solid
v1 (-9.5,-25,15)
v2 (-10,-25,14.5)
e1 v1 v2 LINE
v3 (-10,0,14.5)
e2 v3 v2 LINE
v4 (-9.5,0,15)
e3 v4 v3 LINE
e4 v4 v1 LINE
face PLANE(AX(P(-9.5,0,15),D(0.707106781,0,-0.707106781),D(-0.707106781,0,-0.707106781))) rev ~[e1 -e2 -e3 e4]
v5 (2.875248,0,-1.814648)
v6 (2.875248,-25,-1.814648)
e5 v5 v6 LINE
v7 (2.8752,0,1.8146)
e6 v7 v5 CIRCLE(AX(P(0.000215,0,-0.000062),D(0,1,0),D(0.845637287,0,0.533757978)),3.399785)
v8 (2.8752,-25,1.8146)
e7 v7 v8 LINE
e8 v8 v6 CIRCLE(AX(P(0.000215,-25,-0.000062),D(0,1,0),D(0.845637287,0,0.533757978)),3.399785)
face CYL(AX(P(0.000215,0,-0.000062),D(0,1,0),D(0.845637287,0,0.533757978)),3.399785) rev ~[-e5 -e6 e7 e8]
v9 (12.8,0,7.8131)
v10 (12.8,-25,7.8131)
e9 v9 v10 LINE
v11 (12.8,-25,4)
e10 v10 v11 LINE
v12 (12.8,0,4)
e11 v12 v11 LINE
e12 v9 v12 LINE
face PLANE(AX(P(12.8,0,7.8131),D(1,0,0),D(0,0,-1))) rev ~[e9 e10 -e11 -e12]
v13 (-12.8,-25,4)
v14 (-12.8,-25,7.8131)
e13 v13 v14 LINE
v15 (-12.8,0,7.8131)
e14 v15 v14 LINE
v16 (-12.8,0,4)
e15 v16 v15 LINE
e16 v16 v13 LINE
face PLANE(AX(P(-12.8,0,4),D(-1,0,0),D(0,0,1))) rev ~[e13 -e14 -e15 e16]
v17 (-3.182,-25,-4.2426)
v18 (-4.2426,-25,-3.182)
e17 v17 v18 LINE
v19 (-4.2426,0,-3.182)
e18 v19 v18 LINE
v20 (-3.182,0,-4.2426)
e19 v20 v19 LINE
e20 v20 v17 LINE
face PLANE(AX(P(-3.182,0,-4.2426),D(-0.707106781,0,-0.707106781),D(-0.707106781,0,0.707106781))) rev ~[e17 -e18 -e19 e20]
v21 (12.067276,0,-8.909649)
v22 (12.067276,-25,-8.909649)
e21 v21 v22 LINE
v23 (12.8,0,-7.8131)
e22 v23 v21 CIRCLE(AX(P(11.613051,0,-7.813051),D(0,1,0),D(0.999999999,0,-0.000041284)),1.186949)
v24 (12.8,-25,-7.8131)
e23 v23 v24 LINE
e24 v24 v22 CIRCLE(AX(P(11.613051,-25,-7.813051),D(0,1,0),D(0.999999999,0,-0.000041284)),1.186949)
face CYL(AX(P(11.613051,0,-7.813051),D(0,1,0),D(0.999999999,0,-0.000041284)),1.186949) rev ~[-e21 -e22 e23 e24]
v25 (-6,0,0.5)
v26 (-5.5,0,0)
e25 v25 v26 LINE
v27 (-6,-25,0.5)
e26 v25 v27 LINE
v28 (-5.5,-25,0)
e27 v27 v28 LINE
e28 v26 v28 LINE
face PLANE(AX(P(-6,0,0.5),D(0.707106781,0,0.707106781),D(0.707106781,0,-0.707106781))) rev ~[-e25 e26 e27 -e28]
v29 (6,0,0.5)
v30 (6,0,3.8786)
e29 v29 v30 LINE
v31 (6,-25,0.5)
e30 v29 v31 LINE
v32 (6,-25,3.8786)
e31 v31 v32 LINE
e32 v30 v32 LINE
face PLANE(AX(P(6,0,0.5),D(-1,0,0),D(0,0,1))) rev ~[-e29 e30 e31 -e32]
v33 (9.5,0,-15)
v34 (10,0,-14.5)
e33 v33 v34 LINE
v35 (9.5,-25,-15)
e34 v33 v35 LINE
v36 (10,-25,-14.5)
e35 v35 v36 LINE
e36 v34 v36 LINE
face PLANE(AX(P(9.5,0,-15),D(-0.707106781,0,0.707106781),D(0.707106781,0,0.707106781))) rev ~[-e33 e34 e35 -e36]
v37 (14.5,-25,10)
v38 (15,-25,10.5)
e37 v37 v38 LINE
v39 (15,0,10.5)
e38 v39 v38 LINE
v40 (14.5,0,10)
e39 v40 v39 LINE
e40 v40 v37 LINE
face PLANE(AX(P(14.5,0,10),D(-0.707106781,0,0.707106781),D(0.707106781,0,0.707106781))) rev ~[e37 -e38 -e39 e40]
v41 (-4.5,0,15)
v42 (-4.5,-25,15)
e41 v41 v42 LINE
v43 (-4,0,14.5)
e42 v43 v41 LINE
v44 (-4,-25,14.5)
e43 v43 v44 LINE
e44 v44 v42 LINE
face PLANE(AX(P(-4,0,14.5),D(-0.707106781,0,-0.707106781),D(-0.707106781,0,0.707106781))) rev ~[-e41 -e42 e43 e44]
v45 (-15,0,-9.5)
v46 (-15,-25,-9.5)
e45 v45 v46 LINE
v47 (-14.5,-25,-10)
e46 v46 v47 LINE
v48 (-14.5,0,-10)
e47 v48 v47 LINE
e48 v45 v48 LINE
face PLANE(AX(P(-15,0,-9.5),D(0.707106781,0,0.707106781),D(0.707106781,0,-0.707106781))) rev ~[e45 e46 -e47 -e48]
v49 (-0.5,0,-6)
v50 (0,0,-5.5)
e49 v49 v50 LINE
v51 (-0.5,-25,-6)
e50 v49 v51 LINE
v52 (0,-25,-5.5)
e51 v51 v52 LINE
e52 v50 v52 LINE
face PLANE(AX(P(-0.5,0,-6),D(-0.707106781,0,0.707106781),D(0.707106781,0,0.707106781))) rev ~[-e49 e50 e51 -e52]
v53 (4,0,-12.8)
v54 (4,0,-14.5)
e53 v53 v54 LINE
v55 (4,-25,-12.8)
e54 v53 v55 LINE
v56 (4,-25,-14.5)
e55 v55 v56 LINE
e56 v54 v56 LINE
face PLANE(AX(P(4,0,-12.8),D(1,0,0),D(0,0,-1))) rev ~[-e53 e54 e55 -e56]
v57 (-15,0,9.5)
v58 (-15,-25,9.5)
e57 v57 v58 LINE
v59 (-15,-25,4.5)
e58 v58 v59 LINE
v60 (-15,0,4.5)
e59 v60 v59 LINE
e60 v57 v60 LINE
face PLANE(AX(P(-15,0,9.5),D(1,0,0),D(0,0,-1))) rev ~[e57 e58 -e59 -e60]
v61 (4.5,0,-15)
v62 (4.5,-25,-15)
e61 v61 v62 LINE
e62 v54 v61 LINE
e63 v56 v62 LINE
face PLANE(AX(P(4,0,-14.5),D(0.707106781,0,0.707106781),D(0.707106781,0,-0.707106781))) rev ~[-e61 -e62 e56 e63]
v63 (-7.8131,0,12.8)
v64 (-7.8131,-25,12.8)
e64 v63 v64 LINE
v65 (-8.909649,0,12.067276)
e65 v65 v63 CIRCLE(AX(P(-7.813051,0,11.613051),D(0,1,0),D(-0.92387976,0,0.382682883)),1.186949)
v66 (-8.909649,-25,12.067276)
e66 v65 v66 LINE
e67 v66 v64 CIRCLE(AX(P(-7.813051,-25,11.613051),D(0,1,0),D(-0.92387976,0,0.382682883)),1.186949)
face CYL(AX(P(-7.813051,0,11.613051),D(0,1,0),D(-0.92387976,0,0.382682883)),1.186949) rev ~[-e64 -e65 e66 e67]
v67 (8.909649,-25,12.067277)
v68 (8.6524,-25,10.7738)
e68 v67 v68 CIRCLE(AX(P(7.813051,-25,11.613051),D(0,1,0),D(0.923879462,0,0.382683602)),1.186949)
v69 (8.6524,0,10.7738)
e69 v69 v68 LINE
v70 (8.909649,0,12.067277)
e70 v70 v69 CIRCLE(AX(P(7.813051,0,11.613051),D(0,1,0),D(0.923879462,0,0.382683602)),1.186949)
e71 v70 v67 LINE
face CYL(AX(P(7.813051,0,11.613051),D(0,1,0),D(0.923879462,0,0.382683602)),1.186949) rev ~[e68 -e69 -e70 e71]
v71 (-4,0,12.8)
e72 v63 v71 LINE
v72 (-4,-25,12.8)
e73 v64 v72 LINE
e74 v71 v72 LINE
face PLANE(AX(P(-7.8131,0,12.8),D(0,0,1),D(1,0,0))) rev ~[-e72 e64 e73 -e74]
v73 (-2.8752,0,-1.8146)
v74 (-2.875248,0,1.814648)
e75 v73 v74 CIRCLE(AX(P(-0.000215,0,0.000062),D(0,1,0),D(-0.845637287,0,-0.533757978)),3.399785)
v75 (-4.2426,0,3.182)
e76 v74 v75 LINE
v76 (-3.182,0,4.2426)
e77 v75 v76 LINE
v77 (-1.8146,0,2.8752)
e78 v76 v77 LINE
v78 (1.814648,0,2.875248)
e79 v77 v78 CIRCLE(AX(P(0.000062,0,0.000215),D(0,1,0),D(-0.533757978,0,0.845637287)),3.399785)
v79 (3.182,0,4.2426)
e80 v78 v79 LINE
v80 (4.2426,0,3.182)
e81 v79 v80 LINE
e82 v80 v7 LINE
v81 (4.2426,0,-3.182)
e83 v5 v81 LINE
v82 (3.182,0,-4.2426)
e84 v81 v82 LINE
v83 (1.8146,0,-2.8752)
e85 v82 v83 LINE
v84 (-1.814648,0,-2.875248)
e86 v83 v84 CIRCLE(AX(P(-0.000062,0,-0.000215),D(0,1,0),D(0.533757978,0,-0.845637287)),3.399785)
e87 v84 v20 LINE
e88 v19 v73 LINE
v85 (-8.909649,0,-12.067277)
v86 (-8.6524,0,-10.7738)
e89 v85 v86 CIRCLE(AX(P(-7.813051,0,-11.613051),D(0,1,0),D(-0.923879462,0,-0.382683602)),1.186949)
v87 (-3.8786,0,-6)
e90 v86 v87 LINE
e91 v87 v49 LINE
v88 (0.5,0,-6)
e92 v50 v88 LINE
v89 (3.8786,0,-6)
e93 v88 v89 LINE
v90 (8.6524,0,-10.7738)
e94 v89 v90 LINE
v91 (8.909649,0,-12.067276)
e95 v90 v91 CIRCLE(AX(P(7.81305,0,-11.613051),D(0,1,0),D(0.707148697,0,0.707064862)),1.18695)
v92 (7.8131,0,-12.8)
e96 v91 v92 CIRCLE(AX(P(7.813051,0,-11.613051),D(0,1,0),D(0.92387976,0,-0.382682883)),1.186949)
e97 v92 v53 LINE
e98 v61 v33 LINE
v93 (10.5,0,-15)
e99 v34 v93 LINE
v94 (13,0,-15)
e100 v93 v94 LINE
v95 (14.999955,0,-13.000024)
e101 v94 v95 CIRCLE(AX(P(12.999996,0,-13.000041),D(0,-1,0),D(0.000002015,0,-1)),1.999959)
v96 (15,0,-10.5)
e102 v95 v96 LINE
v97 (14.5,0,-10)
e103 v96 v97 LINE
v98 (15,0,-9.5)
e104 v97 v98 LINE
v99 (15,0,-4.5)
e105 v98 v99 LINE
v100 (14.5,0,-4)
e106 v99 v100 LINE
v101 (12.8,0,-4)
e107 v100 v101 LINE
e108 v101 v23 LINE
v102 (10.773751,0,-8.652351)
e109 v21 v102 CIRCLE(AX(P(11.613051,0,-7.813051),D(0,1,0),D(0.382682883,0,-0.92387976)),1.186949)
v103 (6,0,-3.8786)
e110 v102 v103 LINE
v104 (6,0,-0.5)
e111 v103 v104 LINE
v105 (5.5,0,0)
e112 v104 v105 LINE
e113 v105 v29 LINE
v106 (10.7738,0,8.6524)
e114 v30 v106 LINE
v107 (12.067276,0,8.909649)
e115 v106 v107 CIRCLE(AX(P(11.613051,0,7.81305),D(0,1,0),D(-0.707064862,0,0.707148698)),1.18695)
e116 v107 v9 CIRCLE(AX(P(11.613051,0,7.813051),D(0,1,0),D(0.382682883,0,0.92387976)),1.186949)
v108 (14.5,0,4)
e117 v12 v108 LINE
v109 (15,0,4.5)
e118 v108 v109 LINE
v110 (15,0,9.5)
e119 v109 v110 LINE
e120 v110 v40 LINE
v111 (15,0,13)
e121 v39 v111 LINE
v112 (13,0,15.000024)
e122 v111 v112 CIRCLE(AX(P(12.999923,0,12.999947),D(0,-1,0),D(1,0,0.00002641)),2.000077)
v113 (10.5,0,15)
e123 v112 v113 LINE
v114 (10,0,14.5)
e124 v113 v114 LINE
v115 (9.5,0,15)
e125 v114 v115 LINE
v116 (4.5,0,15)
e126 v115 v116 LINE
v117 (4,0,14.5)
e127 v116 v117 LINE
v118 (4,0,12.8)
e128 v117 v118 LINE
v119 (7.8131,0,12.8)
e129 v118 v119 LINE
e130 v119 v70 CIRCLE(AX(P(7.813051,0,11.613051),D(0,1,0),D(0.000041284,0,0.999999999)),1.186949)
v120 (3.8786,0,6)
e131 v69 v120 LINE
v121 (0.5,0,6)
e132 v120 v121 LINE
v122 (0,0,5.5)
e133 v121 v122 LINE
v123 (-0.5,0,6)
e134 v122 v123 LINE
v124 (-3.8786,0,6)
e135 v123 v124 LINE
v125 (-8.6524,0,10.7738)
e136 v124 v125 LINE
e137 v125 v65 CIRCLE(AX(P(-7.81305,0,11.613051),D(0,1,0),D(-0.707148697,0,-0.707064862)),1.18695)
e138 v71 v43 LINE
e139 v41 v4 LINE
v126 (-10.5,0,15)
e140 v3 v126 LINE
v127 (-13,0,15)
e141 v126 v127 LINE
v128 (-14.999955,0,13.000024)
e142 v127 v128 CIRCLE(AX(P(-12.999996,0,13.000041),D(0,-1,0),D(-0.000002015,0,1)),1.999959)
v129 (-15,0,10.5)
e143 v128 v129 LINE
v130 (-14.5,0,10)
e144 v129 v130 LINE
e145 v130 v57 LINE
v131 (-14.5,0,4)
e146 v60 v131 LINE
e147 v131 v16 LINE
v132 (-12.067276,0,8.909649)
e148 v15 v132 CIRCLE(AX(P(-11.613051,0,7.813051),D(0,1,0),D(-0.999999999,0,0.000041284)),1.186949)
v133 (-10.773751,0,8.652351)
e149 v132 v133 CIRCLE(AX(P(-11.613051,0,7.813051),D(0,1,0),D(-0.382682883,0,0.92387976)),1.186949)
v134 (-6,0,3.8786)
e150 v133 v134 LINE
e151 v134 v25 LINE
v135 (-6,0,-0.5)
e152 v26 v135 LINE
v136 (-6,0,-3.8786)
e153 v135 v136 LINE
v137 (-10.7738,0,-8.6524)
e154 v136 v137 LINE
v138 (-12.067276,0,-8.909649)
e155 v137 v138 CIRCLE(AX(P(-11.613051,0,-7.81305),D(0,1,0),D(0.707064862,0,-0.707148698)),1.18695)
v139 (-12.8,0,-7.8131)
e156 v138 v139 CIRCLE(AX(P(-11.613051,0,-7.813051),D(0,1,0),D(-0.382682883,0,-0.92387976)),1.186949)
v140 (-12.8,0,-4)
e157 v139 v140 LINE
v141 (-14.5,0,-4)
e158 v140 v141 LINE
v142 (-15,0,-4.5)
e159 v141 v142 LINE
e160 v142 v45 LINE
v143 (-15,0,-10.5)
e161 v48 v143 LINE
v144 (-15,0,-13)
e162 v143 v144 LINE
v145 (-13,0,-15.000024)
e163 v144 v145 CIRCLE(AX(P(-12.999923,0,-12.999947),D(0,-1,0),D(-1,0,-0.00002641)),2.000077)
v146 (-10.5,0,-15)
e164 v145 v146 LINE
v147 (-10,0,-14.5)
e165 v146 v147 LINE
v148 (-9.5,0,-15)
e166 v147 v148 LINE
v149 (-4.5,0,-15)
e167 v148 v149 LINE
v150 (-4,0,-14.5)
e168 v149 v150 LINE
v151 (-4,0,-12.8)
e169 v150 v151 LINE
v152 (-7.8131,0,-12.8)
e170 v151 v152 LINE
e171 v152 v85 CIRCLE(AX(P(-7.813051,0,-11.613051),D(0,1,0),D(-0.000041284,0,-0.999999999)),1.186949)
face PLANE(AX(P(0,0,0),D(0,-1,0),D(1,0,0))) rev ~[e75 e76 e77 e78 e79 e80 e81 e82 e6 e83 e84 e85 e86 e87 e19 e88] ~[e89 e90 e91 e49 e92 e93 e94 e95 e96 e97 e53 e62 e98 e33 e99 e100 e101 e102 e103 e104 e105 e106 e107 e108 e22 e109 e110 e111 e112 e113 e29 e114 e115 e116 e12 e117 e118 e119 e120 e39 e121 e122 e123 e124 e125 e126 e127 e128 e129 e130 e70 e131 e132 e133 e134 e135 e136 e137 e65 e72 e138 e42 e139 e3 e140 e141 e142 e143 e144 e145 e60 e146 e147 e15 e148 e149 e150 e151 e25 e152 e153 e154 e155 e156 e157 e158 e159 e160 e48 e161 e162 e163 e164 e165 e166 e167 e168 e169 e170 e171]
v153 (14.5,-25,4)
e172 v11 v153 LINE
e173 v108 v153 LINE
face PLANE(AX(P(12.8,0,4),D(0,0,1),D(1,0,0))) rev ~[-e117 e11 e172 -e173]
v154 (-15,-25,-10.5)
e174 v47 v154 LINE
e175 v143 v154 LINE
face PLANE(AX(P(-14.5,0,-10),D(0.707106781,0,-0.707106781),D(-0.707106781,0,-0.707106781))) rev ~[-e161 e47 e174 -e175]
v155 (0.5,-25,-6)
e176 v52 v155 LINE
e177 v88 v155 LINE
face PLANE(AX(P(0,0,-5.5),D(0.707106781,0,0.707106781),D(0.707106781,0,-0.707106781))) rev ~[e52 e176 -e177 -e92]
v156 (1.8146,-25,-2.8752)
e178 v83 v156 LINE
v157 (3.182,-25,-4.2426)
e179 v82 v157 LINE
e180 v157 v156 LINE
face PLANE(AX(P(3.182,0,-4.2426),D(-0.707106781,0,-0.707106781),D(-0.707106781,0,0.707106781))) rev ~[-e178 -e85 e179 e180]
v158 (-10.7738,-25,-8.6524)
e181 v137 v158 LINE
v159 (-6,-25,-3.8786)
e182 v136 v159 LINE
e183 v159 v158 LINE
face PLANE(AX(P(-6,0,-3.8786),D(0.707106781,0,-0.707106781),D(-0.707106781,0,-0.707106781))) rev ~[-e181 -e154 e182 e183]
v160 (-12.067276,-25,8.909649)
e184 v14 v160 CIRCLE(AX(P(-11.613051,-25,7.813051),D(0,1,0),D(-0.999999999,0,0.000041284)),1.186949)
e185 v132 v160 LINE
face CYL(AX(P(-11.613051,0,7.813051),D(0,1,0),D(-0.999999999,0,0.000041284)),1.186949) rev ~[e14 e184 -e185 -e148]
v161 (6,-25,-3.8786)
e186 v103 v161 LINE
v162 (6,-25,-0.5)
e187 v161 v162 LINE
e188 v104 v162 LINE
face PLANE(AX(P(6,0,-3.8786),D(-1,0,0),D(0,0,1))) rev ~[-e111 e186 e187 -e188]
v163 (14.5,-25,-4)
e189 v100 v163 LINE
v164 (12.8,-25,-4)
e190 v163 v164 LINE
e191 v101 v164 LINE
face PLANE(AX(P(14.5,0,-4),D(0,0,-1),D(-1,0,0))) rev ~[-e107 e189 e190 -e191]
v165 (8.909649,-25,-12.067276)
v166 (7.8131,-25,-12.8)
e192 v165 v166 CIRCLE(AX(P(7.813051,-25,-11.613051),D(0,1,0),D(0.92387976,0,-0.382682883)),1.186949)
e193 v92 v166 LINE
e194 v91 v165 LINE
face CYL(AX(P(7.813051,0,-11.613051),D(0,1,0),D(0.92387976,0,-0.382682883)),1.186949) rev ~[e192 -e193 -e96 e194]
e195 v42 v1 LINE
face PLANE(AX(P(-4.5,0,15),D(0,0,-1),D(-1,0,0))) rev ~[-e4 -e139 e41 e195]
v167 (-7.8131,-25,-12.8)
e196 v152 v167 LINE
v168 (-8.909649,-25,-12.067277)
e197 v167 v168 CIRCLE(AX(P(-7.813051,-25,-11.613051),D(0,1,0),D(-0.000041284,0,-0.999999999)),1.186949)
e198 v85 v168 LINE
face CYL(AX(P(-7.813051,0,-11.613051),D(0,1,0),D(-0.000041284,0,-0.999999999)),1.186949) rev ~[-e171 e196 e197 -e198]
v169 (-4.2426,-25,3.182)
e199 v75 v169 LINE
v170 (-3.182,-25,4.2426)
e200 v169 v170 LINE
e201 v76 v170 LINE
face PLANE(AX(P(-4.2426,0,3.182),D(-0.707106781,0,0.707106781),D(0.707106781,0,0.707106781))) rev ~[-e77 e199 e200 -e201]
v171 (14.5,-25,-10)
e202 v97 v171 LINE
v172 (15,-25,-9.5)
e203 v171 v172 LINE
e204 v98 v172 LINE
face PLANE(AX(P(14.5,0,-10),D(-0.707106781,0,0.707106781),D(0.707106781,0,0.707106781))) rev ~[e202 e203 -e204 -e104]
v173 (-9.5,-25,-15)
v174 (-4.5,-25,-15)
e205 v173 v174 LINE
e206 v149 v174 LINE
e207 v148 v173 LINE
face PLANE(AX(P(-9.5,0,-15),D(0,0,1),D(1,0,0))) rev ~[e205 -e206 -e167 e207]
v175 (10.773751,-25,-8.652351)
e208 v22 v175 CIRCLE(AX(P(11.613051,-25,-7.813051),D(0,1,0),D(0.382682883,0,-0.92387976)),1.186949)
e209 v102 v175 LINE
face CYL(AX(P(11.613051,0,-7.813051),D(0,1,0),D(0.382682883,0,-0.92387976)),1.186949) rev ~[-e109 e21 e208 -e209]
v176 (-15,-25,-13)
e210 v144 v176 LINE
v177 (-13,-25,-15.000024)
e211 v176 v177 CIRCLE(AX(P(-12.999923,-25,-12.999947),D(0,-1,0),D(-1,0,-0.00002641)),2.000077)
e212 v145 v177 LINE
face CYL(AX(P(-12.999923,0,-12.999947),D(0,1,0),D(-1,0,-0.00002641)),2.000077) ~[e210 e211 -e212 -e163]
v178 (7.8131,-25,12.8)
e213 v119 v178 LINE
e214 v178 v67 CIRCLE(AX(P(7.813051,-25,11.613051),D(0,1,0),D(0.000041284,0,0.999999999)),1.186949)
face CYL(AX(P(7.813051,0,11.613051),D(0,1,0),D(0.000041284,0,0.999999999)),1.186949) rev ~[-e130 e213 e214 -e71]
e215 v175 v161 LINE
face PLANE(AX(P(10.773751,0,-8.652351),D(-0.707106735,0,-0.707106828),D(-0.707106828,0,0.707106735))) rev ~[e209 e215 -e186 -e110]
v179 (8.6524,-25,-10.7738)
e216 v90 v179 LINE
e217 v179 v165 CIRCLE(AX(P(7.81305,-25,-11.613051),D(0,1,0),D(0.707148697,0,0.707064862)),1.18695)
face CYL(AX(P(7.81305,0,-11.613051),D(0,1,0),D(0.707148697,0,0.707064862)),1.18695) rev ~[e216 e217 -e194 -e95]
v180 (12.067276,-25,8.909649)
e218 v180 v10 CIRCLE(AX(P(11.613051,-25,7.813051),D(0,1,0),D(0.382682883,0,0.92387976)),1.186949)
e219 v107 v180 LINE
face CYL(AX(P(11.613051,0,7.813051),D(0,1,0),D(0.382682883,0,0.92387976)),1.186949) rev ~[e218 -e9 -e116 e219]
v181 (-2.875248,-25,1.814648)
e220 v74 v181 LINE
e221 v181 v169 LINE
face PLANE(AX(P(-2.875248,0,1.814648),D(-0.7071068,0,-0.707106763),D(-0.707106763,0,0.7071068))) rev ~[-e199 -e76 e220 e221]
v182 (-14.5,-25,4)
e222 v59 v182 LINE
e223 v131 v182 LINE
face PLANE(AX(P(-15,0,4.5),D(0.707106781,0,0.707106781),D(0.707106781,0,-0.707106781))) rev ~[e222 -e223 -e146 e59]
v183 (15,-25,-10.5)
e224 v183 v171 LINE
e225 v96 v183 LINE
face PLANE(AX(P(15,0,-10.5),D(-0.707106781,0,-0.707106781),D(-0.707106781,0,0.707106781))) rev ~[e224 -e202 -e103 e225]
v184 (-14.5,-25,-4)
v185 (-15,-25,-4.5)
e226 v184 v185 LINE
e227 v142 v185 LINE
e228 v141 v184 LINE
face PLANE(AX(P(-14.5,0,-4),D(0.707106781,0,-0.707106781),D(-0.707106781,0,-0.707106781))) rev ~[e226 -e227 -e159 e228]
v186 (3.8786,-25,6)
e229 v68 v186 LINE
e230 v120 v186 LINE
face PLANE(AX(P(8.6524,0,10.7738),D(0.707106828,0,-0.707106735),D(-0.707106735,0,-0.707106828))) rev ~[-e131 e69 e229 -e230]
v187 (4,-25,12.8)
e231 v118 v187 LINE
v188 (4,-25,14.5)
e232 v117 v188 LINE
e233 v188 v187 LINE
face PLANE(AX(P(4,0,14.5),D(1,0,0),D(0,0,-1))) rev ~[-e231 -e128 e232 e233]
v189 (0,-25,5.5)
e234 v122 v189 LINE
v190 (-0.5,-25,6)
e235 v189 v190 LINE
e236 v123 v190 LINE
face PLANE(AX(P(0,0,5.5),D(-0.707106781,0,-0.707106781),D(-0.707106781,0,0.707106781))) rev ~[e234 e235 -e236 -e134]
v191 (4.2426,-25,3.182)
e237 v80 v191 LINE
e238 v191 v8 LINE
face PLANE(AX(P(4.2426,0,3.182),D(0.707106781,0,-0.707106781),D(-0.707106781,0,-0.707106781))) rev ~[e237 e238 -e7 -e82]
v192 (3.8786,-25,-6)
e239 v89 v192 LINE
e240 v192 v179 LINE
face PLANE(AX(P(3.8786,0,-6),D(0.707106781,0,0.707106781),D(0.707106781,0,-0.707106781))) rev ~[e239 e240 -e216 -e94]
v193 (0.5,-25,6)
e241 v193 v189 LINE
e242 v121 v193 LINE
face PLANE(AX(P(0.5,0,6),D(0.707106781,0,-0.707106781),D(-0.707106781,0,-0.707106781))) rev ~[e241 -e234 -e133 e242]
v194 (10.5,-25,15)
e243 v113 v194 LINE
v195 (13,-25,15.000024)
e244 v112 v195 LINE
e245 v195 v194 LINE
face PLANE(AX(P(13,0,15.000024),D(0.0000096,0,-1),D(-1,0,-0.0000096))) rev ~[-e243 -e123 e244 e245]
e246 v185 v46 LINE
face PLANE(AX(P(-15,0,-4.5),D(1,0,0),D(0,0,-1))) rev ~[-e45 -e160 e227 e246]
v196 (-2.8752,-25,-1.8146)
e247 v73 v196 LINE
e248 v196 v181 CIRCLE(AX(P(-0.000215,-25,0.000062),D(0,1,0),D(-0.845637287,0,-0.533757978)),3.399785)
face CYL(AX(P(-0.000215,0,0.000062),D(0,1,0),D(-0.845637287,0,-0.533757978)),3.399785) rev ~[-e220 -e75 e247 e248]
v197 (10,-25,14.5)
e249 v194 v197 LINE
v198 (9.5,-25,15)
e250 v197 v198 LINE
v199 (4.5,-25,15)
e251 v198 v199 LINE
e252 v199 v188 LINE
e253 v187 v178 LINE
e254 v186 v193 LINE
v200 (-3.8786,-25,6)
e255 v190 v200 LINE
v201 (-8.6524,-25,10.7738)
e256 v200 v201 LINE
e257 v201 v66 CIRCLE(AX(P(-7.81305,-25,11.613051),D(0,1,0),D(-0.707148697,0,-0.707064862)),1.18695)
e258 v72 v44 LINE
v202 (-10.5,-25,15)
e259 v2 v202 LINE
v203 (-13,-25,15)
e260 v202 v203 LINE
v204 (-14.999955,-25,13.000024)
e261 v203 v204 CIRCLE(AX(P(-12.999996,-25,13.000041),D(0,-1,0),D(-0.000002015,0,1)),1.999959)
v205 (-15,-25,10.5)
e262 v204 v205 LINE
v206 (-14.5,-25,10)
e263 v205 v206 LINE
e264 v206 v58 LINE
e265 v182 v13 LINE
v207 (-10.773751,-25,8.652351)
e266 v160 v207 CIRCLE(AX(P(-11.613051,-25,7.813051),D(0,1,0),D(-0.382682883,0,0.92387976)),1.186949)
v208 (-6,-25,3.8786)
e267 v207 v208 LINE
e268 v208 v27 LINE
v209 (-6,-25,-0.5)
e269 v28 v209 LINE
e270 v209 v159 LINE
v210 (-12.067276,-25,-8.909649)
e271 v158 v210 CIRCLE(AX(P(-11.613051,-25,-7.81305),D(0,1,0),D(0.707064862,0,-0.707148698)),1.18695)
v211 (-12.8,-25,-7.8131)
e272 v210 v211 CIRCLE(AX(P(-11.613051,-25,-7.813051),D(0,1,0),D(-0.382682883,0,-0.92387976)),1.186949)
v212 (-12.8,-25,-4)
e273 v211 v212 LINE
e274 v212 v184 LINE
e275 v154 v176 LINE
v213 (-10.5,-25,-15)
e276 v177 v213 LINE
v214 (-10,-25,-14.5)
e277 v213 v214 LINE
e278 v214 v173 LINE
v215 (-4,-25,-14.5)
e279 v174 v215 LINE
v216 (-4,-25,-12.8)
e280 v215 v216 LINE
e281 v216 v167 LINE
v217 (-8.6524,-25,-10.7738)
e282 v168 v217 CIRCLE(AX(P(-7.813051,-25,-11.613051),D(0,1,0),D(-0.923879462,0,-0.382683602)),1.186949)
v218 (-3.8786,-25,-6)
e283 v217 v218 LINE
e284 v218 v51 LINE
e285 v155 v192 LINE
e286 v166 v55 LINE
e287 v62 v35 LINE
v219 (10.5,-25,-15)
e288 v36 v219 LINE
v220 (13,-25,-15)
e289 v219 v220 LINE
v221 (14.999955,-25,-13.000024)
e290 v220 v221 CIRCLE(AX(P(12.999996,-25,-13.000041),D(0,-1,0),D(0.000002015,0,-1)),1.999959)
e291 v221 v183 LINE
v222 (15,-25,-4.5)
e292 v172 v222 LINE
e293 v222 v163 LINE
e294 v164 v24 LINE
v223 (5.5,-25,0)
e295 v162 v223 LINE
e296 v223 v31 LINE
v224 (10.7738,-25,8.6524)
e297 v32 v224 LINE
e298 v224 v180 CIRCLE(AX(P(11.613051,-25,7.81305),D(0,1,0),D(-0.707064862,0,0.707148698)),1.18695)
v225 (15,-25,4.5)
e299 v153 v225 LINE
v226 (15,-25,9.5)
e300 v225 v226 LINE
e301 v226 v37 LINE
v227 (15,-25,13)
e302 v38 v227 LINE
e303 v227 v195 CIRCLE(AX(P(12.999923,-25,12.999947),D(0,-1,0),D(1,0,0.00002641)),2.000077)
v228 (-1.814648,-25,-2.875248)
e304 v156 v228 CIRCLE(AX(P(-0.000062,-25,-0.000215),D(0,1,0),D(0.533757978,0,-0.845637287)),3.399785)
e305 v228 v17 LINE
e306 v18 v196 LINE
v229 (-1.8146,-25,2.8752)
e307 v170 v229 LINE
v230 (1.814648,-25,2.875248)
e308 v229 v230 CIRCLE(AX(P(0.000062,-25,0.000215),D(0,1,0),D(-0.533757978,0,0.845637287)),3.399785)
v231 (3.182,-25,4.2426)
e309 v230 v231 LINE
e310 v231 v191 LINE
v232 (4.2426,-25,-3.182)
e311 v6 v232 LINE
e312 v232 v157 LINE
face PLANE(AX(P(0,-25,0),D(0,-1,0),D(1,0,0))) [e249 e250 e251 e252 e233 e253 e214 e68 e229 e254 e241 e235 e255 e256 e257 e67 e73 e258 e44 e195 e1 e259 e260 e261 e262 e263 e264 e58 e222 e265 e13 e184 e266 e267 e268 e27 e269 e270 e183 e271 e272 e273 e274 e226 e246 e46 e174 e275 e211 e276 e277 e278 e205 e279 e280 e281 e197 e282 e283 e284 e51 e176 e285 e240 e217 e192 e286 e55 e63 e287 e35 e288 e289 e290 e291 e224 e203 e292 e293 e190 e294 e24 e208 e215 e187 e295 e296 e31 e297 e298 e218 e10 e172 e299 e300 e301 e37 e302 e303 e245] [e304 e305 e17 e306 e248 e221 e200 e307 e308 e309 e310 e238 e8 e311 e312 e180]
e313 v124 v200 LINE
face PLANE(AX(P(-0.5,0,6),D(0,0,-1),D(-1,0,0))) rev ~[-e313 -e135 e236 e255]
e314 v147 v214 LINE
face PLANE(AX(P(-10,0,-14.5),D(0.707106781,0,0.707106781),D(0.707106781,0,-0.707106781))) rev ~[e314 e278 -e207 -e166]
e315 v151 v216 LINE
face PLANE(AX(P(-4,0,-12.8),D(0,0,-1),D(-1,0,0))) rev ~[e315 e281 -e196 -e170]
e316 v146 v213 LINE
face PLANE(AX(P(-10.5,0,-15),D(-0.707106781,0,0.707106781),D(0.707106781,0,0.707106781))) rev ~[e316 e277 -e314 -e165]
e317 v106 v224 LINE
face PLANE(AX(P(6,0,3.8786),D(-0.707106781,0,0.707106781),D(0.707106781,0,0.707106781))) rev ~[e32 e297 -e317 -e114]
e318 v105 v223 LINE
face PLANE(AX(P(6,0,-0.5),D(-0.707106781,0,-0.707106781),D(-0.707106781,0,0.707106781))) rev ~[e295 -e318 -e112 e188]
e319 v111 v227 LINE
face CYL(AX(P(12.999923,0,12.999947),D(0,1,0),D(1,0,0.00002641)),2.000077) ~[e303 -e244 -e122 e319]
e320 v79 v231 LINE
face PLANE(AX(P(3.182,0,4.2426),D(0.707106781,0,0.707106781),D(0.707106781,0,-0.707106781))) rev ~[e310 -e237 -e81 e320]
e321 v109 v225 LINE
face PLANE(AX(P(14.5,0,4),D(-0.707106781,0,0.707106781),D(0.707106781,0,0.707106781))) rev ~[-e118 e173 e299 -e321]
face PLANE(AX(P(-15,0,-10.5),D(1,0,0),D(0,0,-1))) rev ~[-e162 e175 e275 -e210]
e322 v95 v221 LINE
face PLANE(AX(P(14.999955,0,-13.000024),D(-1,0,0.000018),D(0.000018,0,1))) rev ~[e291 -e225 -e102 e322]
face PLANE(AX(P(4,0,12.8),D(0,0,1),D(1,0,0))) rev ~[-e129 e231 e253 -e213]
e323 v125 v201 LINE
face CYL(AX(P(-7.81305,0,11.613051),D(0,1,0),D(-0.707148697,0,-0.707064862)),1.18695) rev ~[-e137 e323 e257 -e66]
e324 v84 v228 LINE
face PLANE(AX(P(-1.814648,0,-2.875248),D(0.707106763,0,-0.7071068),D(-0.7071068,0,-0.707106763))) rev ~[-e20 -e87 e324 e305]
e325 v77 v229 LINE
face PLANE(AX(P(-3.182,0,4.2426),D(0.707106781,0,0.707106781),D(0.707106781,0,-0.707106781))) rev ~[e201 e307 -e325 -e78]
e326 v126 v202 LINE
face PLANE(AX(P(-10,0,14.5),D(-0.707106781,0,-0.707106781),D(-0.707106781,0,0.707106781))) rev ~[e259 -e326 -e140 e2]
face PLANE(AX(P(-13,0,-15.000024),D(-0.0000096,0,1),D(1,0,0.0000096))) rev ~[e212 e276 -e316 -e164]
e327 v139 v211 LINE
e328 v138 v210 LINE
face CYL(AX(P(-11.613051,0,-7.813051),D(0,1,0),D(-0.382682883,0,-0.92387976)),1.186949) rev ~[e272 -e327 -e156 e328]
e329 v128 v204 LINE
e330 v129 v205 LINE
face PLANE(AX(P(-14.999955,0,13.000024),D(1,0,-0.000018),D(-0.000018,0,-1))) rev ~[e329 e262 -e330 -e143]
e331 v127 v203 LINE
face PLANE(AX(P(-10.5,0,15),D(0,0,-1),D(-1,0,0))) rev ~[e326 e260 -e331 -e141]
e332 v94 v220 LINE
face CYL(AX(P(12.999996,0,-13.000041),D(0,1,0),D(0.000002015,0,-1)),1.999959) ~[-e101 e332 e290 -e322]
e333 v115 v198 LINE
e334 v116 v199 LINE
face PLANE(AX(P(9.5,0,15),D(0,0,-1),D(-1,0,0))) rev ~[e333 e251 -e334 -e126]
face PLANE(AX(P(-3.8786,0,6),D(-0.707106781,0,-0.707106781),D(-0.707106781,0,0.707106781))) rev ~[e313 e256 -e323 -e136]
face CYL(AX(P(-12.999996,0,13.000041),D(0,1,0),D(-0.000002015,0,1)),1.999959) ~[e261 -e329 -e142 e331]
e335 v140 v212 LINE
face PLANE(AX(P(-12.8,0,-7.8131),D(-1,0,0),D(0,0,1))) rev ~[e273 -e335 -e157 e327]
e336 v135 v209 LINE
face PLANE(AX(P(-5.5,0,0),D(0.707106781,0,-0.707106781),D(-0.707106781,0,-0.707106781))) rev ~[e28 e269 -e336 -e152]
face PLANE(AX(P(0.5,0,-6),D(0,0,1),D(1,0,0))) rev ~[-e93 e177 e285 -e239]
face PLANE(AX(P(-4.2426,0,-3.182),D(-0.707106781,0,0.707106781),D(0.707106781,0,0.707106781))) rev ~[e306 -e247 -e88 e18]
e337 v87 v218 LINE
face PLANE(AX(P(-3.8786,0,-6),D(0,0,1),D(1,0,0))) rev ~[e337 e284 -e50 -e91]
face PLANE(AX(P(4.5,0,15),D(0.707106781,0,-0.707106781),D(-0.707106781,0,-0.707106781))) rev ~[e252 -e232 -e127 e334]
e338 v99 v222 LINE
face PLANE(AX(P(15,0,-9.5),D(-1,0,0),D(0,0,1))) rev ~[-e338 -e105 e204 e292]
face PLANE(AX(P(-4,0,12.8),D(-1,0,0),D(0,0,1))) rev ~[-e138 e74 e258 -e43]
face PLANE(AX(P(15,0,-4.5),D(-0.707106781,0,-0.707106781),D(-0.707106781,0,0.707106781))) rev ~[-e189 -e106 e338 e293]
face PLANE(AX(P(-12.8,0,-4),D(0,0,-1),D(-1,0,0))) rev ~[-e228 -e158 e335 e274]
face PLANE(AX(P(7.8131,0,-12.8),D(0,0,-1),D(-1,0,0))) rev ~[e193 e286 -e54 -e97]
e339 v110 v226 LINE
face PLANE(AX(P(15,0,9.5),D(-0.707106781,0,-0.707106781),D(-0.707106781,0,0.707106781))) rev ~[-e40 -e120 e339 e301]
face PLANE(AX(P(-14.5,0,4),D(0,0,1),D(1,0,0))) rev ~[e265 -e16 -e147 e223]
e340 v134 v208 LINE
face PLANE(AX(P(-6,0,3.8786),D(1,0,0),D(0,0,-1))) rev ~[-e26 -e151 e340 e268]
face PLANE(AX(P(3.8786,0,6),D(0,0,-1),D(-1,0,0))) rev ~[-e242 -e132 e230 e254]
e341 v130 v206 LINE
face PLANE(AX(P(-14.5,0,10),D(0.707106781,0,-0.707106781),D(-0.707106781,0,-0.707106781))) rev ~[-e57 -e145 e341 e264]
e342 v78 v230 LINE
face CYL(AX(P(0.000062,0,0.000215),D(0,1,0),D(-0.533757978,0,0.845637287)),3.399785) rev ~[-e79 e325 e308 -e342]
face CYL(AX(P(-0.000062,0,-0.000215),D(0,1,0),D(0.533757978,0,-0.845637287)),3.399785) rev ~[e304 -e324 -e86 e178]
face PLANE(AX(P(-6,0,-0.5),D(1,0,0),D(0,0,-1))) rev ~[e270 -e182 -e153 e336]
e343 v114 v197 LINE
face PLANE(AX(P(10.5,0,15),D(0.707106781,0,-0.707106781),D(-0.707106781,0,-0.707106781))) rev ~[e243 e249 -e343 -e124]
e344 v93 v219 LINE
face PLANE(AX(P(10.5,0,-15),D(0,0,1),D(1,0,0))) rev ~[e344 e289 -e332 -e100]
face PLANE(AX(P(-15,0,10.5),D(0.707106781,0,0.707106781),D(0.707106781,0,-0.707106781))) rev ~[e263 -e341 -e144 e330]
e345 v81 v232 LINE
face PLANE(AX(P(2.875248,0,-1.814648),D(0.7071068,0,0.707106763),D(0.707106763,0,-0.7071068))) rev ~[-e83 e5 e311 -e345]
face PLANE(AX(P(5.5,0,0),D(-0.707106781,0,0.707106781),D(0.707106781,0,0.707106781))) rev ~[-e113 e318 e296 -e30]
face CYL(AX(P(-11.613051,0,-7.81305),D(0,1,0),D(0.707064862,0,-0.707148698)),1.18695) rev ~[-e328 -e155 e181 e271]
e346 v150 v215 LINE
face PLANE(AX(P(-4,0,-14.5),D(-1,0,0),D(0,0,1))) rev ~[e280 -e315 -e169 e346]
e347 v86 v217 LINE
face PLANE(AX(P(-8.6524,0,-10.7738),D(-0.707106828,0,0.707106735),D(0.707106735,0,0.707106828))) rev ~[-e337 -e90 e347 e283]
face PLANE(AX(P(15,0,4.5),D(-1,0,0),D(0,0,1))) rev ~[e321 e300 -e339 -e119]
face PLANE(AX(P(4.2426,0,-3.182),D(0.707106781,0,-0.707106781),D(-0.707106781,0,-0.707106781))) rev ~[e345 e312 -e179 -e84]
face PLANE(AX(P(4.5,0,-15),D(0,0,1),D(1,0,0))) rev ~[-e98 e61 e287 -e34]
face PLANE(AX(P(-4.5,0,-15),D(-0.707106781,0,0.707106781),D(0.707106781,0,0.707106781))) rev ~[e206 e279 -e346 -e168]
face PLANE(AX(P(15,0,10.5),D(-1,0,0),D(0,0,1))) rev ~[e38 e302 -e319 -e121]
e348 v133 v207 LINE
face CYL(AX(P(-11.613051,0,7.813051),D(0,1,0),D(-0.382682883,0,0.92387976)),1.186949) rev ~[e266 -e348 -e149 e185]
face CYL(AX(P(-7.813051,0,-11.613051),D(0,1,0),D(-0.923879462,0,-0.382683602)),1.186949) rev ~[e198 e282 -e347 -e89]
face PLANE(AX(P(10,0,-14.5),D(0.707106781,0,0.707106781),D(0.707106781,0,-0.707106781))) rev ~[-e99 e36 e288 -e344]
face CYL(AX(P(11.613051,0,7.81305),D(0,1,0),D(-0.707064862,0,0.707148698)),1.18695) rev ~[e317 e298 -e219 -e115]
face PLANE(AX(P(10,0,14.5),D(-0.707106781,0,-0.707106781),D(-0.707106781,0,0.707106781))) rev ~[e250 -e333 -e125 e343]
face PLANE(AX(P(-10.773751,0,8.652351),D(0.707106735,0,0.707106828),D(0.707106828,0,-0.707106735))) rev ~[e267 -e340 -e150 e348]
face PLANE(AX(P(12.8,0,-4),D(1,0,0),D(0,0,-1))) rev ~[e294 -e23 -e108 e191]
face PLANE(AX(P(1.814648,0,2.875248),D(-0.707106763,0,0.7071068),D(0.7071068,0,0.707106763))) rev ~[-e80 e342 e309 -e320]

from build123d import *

# Parameters (mm, degrees)
F1_DEPTH = 25


# Not quite as in the source:
# - ends of sketch curves that miss each other by under 0.0002 mm in the source are joined


with BuildPart() as f1:
    # F0 (on Front) → F1 (new body)
    with BuildSketch(Plane.XZ):
        with BuildLine():
            ThreePointArc((-12.0672760652, 8.9096491574), (-11.3814883912, 8.9771930389), (-10.7737513132, 8.6523506868))
            Line((-10.7737513132, 8.6523506868), (-6, 3.8786))
            Line((-6, 3.8786), (-6, 0.5))
            Line((-6, 0.5), (-5.5, 0))
            Line((-5.5, 0), (-6, -0.5))
            Line((-6, -0.5), (-6, -3.8786))
            Line((-6, -3.8786), (-10.7738, -8.6524))
            ThreePointArc((-10.7738, -8.6524), (-11.3814883912, -8.9771930389), (-12.0672760652, -8.9096491574))
            ThreePointArc((-12.0672760652, -8.9096491574), (-12.5999492171, -8.4725051968), (-12.799999999, -7.8131))
            Line((-12.799999999, -7.8131), (-12.8, -4))
            Line((-12.8, -4), (-14.5, -4))
            Line((-14.5, -4), (-15, -4.5))
            Line((-15, -4.5), (-15, -9.5))
            Line((-15, -9.5), (-14.5, -10))
            Line((-14.5, -10), (-15, -10.5))
            Line((-15, -10.5), (-15, -13))
            ThreePointArc((-15, -13), (-14.4141844722, -14.4142216524), (-13, -15.0000239995))
            Line((-13, -15.0000239995), (-10.5, -15))
            Line((-10.5, -15), (-10, -14.5))
            Line((-10, -14.5), (-9.5, -15))
            Line((-9.5, -15), (-4.5, -15))
            Line((-4.5, -15), (-4, -14.5))
            Line((-4, -14.5), (-4, -12.8))
            Line((-4, -12.8), (-7.8131, -12.8))
            ThreePointArc((-7.8131, -12.8), (-8.4725048128, -12.5999494737), (-8.9096488038, -12.0672769187))
            ThreePointArc((-8.9096488038, -12.0672769187), (-8.977199798, -11.3815223738), (-8.6523996854, -10.7738003146))
            Line((-8.6523996854, -10.7738003146), (-3.8786, -6))
            Line((-3.8786, -6), (-0.5, -6))
            Line((-0.5, -6), (0, -5.5))
            Line((0, -5.5), (0.5, -6))
            Line((0.5, -6), (3.8786, -6))
            Line((3.8786, -6), (8.6524, -10.7738))
            ThreePointArc((8.6524, -10.7738), (8.977199798, -11.3815223738), (8.9096491574, -12.0672760652))
            ThreePointArc((8.9096491574, -12.0672760652), (8.4725048128, -12.5999494737), (7.8131, -12.799999999))
            Line((7.8131, -12.799999999), (4, -12.8))
            Line((4, -12.8), (4, -14.5))
            Line((4, -14.5), (4.5, -15))
            Line((4.5, -15), (9.5, -15))
            Line((9.5, -15), (10, -14.5))
            Line((10, -14.5), (10.5, -15))
            Line((10.5, -15), (13, -15))
            ThreePointArc((13, -15), (14.4141844722, -14.4142216524), (14.999955, -13.000024))
            Line((14.999955, -13.000024), (15, -10.5))
            Line((15, -10.5), (14.5, -10))
            Line((14.5, -10), (15, -9.5))
            Line((15, -9.5), (15, -4.5))
            Line((15, -4.5), (14.5, -4))
            Line((14.5, -4), (12.8, -4))
            Line((12.8, -4), (12.8, -7.8131))
            ThreePointArc((12.8, -7.8131), (12.5999492171, -8.4725051968), (12.0672760652, -8.9096491574))
            ThreePointArc((12.0672760652, -8.9096491574), (11.3814883912, -8.9771930389), (10.7737513132, -8.6523506868))
            Line((10.7737513132, -8.6523506868), (6, -3.8786))
            Line((6, -3.8786), (6, -0.5))
            Line((6, -0.5), (5.5, 0))
            Line((5.5, 0), (6, 0.5))
            Line((6, 0.5), (6, 3.8786))
            Line((6, 3.8786), (10.7738, 8.6524))
            ThreePointArc((10.7738, 8.6524), (11.3814883912, 8.9771930389), (12.0672760652, 8.9096491574))
            ThreePointArc((12.0672760652, 8.9096491574), (12.5999492171, 8.4725051968), (12.799999999, 7.8131))
            Line((12.799999999, 7.8131), (12.8, 4))
            Line((12.8, 4), (14.5, 4))
            Line((14.5, 4), (15, 4.5))
            Line((15, 4.5), (15, 9.5))
            Line((15, 9.5), (14.5, 10))
            Line((14.5, 10), (15, 10.5))
            Line((15, 10.5), (15, 13))
            ThreePointArc((15, 13), (14.4141844722, 14.4142216524), (13, 15.0000239995))
            Line((13, 15.0000239995), (10.5, 15))
            Line((10.5, 15), (10, 14.5))
            Line((10, 14.5), (9.5, 15))
            Line((9.5, 15), (4.5, 15))
            Line((4.5, 15), (4, 14.5))
            Line((4, 14.5), (4, 12.8))
            Line((4, 12.8), (7.8131, 12.8))
            ThreePointArc((7.8131, 12.8), (8.4725048128, 12.5999494737), (8.9096488038, 12.0672769187))
            ThreePointArc((8.9096488038, 12.0672769187), (8.977199798, 11.3815223738), (8.6523996854, 10.7738003146))
            Line((8.6523996854, 10.7738003146), (3.8786, 6))
            Line((3.8786, 6), (0.5, 6))
            Line((0.5, 6), (0, 5.5))
            Line((0, 5.5), (-0.5, 6))
            Line((-0.5, 6), (-3.8786, 6))
            Line((-3.8786, 6), (-8.6524, 10.7738))
            ThreePointArc((-8.6524, 10.7738), (-8.977199798, 11.3815223738), (-8.9096491574, 12.0672760652))
            ThreePointArc((-8.9096491574, 12.0672760652), (-8.4725048128, 12.5999494737), (-7.8131, 12.799999999))
            Line((-7.8131, 12.799999999), (-4, 12.8))
            Line((-4, 12.8), (-4, 14.5))
            Line((-4, 14.5), (-4.5, 15))
            Line((-4.5, 15), (-9.5, 15))
            Line((-9.5, 15), (-10, 14.5))
            Line((-10, 14.5), (-10.5, 15))
            Line((-10.5, 15), (-13, 15))
            ThreePointArc((-13, 15), (-14.4141844722, 14.4142216524), (-14.999955, 13.000024))
            Line((-14.999955, 13.000024), (-15, 10.5))
            Line((-15, 10.5), (-14.5, 10))
            Line((-14.5, 10), (-15, 9.5))
            Line((-15, 9.5), (-15, 4.5))
            Line((-15, 4.5), (-14.5, 4))
            Line((-14.5, 4), (-12.8, 4))
            Line((-12.8, 4), (-12.8, 7.8131))
            ThreePointArc((-12.8, 7.8131), (-12.5999492171, 8.4725051968), (-12.0672760652, 8.9096491574))
        make_face()
        with BuildLine():
            Line((-4.2426, -3.182), (-2.8752, -1.8146))
            ThreePointArc((-2.8752, -1.8146), (-3.4, 0), (-2.8752481958, 1.8146481236))
            Line((-2.8752481958, 1.8146481236), (-4.2426, 3.182))
            Line((-4.2426, 3.182), (-3.182, 4.2426))
            Line((-3.182, 4.2426), (-1.8146, 2.8752))
            ThreePointArc((-1.8146, 2.8752), (0, 3.4), (1.8146481236, 2.8752481958))
            Line((1.8146481236, 2.8752481958), (3.182, 4.2426))
            Line((3.182, 4.2426), (4.2426, 3.182))
            Line((4.2426, 3.182), (2.8752, 1.8146))
            ThreePointArc((2.8752, 1.8146), (3.4, 0), (2.8752481958, -1.8146481236))
            Line((2.8752481958, -1.8146481236), (4.2426, -3.182))
            Line((4.2426, -3.182), (3.182, -4.2426))
            Line((3.182, -4.2426), (1.8146, -2.8752))
            ThreePointArc((1.8146, -2.8752), (0, -3.4), (-1.8146481236, -2.8752481958))
            Line((-1.8146481236, -2.8752481958), (-3.182, -4.2426))
            Line((-3.182, -4.2426), (-4.2426, -3.182))
        make_face(mode=Mode.SUBTRACT)
    extrude(amount=F1_DEPTH)


solid = f1.part
